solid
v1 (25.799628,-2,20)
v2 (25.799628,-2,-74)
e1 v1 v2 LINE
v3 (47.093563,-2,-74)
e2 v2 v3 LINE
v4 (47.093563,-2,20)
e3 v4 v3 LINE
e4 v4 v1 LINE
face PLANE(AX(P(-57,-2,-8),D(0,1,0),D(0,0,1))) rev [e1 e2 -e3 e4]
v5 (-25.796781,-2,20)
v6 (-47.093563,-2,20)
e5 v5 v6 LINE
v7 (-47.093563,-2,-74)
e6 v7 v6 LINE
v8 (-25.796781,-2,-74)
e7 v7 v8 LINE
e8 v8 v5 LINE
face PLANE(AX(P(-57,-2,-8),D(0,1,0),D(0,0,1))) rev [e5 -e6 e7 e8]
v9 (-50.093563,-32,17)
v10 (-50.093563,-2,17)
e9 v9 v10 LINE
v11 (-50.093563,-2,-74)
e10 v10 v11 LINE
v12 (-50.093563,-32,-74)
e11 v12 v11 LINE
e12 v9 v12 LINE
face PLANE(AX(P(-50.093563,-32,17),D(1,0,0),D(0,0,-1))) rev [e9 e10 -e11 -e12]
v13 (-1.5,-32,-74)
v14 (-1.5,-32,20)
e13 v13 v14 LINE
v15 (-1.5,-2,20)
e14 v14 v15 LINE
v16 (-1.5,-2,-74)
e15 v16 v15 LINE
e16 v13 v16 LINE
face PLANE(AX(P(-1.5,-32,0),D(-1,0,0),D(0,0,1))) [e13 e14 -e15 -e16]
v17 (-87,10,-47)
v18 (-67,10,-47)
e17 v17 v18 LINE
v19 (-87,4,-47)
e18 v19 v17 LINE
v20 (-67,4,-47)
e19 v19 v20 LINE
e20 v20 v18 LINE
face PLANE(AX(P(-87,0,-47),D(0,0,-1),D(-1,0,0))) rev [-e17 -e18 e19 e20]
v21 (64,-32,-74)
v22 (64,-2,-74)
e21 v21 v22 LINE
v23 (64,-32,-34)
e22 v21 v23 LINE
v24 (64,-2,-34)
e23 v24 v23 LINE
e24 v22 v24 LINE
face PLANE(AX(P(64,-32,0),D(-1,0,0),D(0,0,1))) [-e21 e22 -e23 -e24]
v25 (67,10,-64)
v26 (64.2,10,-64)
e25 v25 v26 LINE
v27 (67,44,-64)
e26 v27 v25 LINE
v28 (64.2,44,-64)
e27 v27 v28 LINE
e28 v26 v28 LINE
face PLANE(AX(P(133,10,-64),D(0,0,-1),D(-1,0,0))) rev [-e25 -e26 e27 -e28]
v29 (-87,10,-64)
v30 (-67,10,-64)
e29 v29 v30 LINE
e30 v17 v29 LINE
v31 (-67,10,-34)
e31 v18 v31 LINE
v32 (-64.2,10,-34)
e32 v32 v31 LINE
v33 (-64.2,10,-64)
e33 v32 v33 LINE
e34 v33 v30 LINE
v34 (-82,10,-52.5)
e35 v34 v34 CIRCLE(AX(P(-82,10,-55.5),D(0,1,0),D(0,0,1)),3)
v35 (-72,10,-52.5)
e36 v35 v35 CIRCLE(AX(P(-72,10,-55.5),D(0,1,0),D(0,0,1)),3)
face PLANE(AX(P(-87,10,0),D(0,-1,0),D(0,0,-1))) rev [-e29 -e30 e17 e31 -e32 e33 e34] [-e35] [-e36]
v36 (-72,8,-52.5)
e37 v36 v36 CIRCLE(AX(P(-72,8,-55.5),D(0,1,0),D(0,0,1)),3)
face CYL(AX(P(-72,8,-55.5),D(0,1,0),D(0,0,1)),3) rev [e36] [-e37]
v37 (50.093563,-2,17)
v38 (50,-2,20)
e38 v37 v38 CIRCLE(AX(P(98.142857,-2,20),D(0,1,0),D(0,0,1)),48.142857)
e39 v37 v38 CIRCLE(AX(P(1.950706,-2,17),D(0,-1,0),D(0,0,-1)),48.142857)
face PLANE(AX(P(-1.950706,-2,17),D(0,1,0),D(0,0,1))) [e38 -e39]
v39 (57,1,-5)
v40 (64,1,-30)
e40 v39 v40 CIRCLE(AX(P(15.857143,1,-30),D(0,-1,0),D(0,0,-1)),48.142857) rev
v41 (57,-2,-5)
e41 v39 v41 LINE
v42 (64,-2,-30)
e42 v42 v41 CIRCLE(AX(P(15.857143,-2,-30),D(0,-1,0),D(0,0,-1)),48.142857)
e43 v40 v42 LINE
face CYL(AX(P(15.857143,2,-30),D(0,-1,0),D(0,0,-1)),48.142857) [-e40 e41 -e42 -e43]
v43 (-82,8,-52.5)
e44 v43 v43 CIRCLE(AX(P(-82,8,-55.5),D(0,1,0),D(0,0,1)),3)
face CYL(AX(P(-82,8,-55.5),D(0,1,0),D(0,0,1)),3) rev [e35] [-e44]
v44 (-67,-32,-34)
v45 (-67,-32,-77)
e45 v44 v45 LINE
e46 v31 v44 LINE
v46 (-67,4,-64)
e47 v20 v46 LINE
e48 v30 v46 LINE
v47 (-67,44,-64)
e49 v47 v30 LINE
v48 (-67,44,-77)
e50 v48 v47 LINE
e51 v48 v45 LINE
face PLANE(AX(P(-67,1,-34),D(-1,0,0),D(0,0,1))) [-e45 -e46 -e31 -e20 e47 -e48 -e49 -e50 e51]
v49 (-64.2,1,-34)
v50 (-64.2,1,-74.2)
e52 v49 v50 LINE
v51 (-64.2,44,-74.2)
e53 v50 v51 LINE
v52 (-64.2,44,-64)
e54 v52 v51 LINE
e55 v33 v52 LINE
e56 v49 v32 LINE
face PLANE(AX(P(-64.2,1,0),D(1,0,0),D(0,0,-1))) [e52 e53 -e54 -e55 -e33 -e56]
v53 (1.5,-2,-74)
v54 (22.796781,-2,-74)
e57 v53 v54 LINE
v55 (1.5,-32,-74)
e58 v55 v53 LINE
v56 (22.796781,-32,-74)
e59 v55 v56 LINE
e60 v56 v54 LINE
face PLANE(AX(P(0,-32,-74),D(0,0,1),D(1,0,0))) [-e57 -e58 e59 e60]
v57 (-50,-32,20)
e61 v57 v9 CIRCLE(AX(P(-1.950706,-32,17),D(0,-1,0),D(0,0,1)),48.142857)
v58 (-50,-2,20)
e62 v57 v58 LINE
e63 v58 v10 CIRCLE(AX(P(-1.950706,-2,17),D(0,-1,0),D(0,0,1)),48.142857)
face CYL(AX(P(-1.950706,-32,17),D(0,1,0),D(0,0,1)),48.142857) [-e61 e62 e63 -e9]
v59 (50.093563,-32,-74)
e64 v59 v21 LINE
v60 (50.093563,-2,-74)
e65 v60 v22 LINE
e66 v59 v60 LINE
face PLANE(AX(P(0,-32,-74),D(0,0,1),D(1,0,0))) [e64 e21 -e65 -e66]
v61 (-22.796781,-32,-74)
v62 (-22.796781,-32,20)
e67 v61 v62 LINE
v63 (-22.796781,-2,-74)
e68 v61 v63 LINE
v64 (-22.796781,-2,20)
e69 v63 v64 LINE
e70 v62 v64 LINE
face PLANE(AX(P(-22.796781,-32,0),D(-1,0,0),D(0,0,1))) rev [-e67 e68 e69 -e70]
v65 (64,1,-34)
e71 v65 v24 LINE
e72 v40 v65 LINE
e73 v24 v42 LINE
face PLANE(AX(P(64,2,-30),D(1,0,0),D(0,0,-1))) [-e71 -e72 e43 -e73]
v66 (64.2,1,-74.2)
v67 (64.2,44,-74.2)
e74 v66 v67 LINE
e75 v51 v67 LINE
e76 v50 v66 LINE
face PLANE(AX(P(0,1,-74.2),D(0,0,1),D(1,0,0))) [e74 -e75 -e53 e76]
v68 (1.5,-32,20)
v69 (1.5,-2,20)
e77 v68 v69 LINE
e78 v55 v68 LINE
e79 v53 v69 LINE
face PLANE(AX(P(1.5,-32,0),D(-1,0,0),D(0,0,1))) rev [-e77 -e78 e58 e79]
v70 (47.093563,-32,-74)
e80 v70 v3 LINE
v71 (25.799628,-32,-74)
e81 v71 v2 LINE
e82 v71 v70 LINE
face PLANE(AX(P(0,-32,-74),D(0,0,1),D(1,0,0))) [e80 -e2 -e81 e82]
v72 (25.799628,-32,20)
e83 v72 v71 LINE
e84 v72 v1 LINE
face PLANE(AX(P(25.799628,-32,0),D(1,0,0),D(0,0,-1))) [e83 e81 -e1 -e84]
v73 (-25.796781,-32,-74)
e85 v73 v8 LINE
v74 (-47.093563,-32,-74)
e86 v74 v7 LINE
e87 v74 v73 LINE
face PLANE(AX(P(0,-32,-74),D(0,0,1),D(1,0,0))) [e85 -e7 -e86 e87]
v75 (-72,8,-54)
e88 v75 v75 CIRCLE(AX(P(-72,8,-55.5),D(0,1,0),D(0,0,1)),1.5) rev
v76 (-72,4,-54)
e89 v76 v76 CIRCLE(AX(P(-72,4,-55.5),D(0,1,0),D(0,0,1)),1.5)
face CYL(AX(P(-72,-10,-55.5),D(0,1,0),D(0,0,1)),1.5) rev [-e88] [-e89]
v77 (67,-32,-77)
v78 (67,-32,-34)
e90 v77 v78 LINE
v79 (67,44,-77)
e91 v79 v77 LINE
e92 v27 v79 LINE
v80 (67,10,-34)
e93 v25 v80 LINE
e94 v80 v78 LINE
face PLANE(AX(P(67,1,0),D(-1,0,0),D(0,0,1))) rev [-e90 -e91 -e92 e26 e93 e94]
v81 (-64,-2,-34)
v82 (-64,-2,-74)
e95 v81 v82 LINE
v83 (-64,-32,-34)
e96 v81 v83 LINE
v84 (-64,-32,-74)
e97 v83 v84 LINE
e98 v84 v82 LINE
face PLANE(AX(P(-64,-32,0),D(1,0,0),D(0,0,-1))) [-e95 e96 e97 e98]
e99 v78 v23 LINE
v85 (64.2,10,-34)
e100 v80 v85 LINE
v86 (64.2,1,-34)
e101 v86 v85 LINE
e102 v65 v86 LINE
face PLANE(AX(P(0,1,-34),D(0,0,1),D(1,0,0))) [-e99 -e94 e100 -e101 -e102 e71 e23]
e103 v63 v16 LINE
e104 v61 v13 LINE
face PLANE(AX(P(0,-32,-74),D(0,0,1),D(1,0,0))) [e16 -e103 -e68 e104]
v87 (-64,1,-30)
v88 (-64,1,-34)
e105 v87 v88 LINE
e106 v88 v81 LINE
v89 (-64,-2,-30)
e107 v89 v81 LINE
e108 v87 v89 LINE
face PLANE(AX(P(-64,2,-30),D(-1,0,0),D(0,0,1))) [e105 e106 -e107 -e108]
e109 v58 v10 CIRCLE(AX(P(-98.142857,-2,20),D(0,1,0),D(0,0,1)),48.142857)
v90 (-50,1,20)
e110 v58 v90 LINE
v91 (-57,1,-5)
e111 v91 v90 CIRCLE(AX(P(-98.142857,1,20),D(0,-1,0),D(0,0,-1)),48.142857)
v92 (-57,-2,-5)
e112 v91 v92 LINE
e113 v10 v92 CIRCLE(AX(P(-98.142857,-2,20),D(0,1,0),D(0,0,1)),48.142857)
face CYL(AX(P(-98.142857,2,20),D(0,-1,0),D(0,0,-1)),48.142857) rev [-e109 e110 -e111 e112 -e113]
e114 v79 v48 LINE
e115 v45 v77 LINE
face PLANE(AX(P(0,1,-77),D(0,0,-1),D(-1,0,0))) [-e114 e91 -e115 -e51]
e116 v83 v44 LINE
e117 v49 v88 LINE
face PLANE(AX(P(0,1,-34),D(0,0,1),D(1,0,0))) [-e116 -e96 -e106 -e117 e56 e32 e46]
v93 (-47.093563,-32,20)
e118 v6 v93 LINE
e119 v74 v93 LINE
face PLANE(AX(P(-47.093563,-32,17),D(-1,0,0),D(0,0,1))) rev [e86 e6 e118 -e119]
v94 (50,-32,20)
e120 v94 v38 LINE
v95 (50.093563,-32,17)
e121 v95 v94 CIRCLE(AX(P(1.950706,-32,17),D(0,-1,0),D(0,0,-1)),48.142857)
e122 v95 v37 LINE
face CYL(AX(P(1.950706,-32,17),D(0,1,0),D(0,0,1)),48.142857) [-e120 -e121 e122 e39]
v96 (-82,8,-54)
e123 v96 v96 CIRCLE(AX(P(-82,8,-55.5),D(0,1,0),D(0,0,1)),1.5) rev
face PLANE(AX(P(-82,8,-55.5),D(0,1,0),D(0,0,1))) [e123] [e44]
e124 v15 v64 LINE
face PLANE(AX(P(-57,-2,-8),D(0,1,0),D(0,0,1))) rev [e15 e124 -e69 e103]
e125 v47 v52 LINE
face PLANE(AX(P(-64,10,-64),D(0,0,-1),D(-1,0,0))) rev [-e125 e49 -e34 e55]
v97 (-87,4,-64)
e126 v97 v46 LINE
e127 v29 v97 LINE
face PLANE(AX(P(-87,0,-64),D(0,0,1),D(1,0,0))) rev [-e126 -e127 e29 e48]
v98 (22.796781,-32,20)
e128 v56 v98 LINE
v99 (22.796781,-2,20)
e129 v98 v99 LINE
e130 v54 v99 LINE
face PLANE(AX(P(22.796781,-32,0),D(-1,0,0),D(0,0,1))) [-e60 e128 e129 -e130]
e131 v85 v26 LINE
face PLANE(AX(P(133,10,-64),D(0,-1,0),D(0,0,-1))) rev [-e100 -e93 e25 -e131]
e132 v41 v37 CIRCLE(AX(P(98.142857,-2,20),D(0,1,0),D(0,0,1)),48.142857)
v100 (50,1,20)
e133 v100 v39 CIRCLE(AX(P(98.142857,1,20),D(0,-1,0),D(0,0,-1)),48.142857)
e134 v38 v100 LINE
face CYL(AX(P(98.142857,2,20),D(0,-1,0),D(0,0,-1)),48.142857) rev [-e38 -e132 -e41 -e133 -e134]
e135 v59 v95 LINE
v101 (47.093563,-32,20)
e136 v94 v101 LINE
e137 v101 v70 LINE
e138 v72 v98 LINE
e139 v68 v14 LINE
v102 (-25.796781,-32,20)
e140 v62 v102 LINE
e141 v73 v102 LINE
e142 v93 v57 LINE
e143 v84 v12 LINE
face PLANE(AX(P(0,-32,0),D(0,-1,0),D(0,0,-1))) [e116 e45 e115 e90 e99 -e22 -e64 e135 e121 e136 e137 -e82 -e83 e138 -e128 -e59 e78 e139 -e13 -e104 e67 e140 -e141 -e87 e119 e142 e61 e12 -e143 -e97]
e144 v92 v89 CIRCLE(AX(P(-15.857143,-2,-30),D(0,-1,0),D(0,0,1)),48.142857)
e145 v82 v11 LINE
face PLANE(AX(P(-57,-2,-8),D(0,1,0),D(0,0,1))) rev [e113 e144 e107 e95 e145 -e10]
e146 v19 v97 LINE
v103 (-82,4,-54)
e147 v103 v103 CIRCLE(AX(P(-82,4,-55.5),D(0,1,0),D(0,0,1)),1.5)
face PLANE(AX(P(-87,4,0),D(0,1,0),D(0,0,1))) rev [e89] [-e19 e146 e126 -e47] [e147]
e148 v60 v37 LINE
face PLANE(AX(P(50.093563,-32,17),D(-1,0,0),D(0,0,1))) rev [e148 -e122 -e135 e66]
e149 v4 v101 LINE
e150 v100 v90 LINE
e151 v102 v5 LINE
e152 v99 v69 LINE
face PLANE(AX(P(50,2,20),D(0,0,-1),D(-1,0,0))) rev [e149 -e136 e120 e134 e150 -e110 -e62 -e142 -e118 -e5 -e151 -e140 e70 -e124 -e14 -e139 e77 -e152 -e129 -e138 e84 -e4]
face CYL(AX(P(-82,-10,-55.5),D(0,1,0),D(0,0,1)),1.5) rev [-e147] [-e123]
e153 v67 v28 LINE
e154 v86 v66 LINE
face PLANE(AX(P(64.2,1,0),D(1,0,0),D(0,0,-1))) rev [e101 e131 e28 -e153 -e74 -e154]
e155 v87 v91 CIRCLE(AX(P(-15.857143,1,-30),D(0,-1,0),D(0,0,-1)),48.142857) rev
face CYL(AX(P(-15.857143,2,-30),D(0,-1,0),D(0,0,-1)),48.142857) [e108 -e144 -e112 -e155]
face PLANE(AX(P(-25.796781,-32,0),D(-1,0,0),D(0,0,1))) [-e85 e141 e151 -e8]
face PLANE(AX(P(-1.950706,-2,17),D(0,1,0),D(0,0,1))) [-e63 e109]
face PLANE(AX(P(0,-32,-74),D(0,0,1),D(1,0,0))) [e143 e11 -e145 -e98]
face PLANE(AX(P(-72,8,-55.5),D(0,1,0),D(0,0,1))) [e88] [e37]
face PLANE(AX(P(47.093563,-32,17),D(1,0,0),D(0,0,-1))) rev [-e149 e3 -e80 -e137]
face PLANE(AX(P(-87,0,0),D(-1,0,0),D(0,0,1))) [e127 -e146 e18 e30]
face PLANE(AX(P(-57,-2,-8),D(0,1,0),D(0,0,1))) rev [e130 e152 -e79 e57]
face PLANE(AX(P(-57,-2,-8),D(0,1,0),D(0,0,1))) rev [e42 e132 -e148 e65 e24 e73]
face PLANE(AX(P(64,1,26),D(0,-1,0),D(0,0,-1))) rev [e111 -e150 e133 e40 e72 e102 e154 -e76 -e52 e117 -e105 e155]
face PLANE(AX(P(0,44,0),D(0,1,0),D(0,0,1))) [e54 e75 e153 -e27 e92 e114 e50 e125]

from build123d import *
from build123d.topology import SkipClean

# Parameters (mm, degrees)
SKETCH_1_R           = 10
SKETCH_1_W           = 40
SKETCH_1_H           = 40
EXTRUDE_1_DEPTH      = 2
EXTRUDE_START        = 2
SKETCH_2_R           = 10
EXTRUDE_2_DEPTH      = 2
SKETCH_4_R           = 15
EXTRUDE_3_DEPTH      = 8
EXTRUDE_START_2      = -8
SKETCH_7_R           = 15
SKETCH_7_R_2         = 10
EXTRUDE_4_DEPTH      = 8
SKETCH_11_R          = 15
SKETCH_11_R_2        = 10
EXTRUDE_5_DEPTH      = 8
FILLET_1_R           = 8
EXTRUDE_START_3      = -1
SKETCH_20_R          = 10
EXTRUDE_7_DEPTH      = 1
CUT_EXTRUDE_START    = -4
CUT_EXTRUDE_2_DEPTH  = 4
EXTRUDE_8_DEPTH      = 4
SKETCH_28_R          = 10
EXTRUDE_10_DEPTH     = 4
SKETCH_29_R          = 10
CUT_EXTRUDE_5_DEPTH  = 3
CUT_EXTRUDE_START_2  = -8
CUT_EXTRUDE_6_DEPTH  = 8
SKETCH_32_R          = 10
EXTRUDE_11_DEPTH     = 4
SKETCH_33_W          = 128
SKETCH_33_H          = 1
CUT_EXTRUDE_7_DEPTH  = 100
SKETCH_34_W          = 128
SKETCH_34_H          = 3
EXTRUDE_12_DEPTH     = 42
EXTRUDE_13_DEPTH     = 3
SKETCH_36_W          = 128
SKETCH_36_H          = 3
EXTRUDE_14_DEPTH     = 30
EXTRUDE_15_DEPTH     = 30
SKETCH_40_W          = 128
SKETCH_40_H          = 3
EXTRUDE_16_DEPTH     = 30
SKETCH_41_W          = 3
SKETCH_41_H          = 51
EXTRUDE_17_DEPTH     = 30
SKETCH_42_W          = 128
SKETCH_42_H          = 0.2
SKETCH_42_W_2        = 0.2
SKETCH_42_H_2        = 40
CUT_EXTRUDE_8_DEPTH  = 42
EXTRUDE_18_DEPTH     = 20
CUT_EXTRUDE_9_DEPTH  = 20
SKETCH_45_R          = 5
CUT_EXTRUDE_10_DEPTH = 3
SKETCH_46_W          = 17
SKETCH_46_H          = 6
EXTRUDE_19_DEPTH     = 20
SKETCH_47_W          = 20
SKETCH_47_H          = 6
CUT_EXTRUDE_11_DEPTH = 20
CUT_EXTRUDE_12_DEPTH = 20
SKETCH_49_R          = 3
CUT_EXTRUDE_13_DEPTH = 2
SKETCH_50_W          = 30
SKETCH_50_H          = 33
CUT_EXTRUDE_14_DEPTH = 3
SKETCH_51_W          = 128.4
SKETCH_51_H          = 2.8
EXTRUDE_20_DEPTH     = 1
SKETCH_52_W          = 128
SKETCH_52_H          = 3
SKETCH_52_W_2        = 94.187125454
CUT_EXTRUDE_15_DEPTH = 30
SKETCH_53_W          = 3
SKETCH_53_H          = 40
EXTRUDE_21_DEPTH     = 30
SKETCH_54_W          = 1.5
SKETCH_54_H          = 47
SKETCH_54_W_2        = 3
SKETCH_54_H_2        = 94
SKETCH_54_W_3        = 1.502846805
EXTRUDE_23_DEPTH     = 30
SKETCH_55_W          = 30
SKETCH_55_H          = 34
CUT_EXTRUDE_16_DEPTH = 200


with BuildPart() as part:
    # 草图1 → 凸台-拉伸1 (new body)
    with BuildSketch(Plane(origin=(0, 0, 0), x_dir=(1, 0, 0), z_dir=(0, 1, 0))):
        with BuildLine():
            Line((0, -20), (50, -20))
            Line((50, -20), (57, -20))
            ThreePointArc((57, -20), (76.798989873, -11.798989873), (85, 8))
            Line((85, 8), (85, 52))
            Line((85, 52), (43, 52))
            Line((43, 52), (43, 72))
            Line((43, 72), (-43, 72))
            Line((-43, 72), (-43, 52))
            Line((-43, 52), (-85, 52))
            Line((-85, 52), (-85, 50))
            Line((-85, 50), (-85, 8))
            ThreePointArc((-85, 8), (-76.798989873, -11.798989873), (-57, -20))
            Line((-57, -20), (-50, -20))
            Line((-50, -20), (0, -20))
        make_face()
        with Locations(Location((18, 0, 0), (0, 0, 270))):
            Circle(SKETCH_1_R, mode=Mode.SUBTRACT)
        with Locations(Location((-18, 0, 0), (0, 0, 270))):
            Circle(SKETCH_1_R, mode=Mode.SUBTRACT)
        with Locations((-21, 50)):
            Rectangle(SKETCH_1_W, SKETCH_1_H, mode=Mode.SUBTRACT)
        with Locations((21, 50)):
            Rectangle(SKETCH_1_W, SKETCH_1_H, mode=Mode.SUBTRACT)
        with Locations((-63, 30)):
            Rectangle(SKETCH_1_W, SKETCH_1_H, mode=Mode.SUBTRACT)
        with Locations((63, 30)):
            Rectangle(SKETCH_1_W, SKETCH_1_H, mode=Mode.SUBTRACT)
    extrude(amount=EXTRUDE_1_DEPTH)

    # 草图2 → 凸台-拉伸2 (add)
    with SkipClean():  # the faces are left unmerged after this step: merging them gives an invalid solid
        with BuildSketch(Plane.XZ.offset(EXTRUDE_START)):
            with BuildLine():
                Line((-85, -8), (-85, -52))
                Line((-85, -52), (-43, -52))
                Line((-43, -52), (-43, -72))
                Line((-43, -72), (43, -72))
                Line((43, -72), (43, -52))
                Line((43, -52), (85, -52))
                Line((85, -52), (85, -8))
                ThreePointArc((85, -8), (76.798989873, 11.798989873), (57, 20))
                Line((57, 20), (-57, 20))
                ThreePointArc((-57, 20), (-76.798989873, 11.798989873), (-85, -8))
            make_face()
            with Locations(Location((-18, 0, 0), (0, 0, 270))):
                Circle(SKETCH_2_R, mode=Mode.SUBTRACT)
            with Locations(Location((18, 0, 0), (0, 0, 270))):
                Circle(SKETCH_2_R, mode=Mode.SUBTRACT)
        extrude(amount=-EXTRUDE_2_DEPTH)

    # 草图4 → 凸台-拉伸3 (add)
    with BuildSketch(Plane(origin=(0, 2, 0), x_dir=(1, 0, 0), z_dir=(0, 1, 0))):
        with BuildLine():
            Line((-50, -20), (0, -20))
            Line((0, -20), (50, -20))
            ThreePointArc((50, -20), (0, 30), (-50, -20))
        make_face()
        with Locations(Location((-18, 0, 0), (0, 0, 270))):
            Circle(SKETCH_4_R, mode=Mode.SUBTRACT)
        with Locations(Location((18, 0, 0), (0, 0, 270))):
            Circle(SKETCH_4_R, mode=Mode.SUBTRACT)
    extrude(amount=EXTRUDE_3_DEPTH)

    # loft up to a face of the part (loft_1)
    loft([Face(Wire([part.edges().sort_by_distance((-28.934529411, 10, -10.268206589))[0]])), Face(Wire([part.edges().sort_by_distance((-25.289686274, 2, -6.845471059))[0]]))], mode=Mode.SUBTRACT)

    # 草图7 → 凸台-拉伸4 (add)
    with BuildSketch(Plane(origin=(0, 10, 0), x_dir=(1, 0, 0), z_dir=(0, 1, 0)).offset(EXTRUDE_START_2)):
        with Locations((-18, 0)):
            Circle(SKETCH_7_R)
        with Locations(Location((-18, 0, 0), (0, 0, 90))):
            Circle(SKETCH_7_R_2, mode=Mode.SUBTRACT)
    extrude(amount=EXTRUDE_4_DEPTH)

    # 切除-放样2: read off the stored shape, not the designer's step
    # 切除-放样2: loft between two sections, ruled curve by curve
    loft_2_from = [
        Edge.make_bspline([(-3.624862246, 10, -4.284321948), (4.943781649, 10, 24.465953561), (-23.806493859, 10, 33.034597456), (-32.375137754, 10, 4.284321948), (-40.943781649, 10, -24.465953561), (-12.193506141, 10, -33.034597456), (-3.624862246, 10, -4.284321948)], [0, 0, 0, 0, 0.5, 0.5, 0.5, 1, 1, 1, 1], 3, [1, 0.333333333, 0.333333333, 1, 0.333333333, 0.333333333, 1]),
    ]
    loft_2_to = [
        Edge.make_bspline([(-10.022055605, 2, -6.029295417), (2.036535229, 2, 9.926593374), (-13.919353562, 2, 21.985184208), (-25.977944395, 2, 6.029295417), (-38.036535229, 2, -9.926593374), (-22.080646438, 2, -21.985184208), (-10.022055605, 2, -6.029295417)], [0, 0, 0, 0, 0.5, 0.5, 0.5, 1, 1, 1, 1], 3, [1, 0.333333333, 0.333333333, 1, 0.333333333, 0.333333333, 1]),
    ]
    loft_2 = Solid(Shell([*[Face.make_surface_from_curves(loft_2_from[k], loft_2_to[k]) for k in range(1)], Face(Wire(loft_2_from)), Face(Wire(loft_2_to))]))
    add(loft_2, mode=Mode.SUBTRACT)

    # 草图11 → 凸台-拉伸5 (add)
    with BuildSketch(Plane(origin=(0, 10, 0), x_dir=(1, 0, 0), z_dir=(0, 1, 0)).offset(EXTRUDE_START_2)):
        with Locations((18, 0)):
            Circle(SKETCH_11_R)
        with Locations(Location((18, 0, 0), (0, 0, 90))):
            Circle(SKETCH_11_R_2, mode=Mode.SUBTRACT)
    extrude(amount=EXTRUDE_5_DEPTH)

    # 切除-放样3: read off the stored shape, not the designer's step
    # 切除-放样3: loft between two sections, ruled curve by curve
    loft_3_from = [
        Edge.make_bspline([(32.65702084, 10, -3.189316556), (39.035653951, 10, 26.124725125), (9.721612271, 10, 32.503358236), (3.34297916, 10, 3.189316556), (-3.035653951, 10, -26.124725125), (26.278387729, 10, -32.503358236), (32.65702084, 10, -3.189316556)], [0, 0, 0, 0, 0.5, 0.5, 0.5, 1, 1, 1, 1], 3, [1, 0.333333333, 0.333333333, 1, 0.333333333, 0.333333333, 1]),
    ]
    loft_3_to = [
        Edge.make_bspline([(26.664439789, 2, -4.992743049), (36.649925886, 2, 12.336136528), (19.321046309, 2, 22.321622626), (9.335560211, 2, 4.992743049), (-0.649925886, 2, -12.336136528), (16.678953691, 2, -22.321622626), (26.664439789, 2, -4.992743049)], [0, 0, 0, 0, 0.5, 0.5, 0.5, 1, 1, 1, 1], 3, [1, 0.333333333, 0.333333333, 1, 0.333333333, 0.333333333, 1]),
    ]
    loft_3 = Solid(Shell([*[Face.make_surface_from_curves(loft_3_from[k], loft_3_to[k]) for k in range(1)], Face(Wire(loft_3_from)), Face(Wire(loft_3_to))]))
    add(loft_3, mode=Mode.SUBTRACT)

    # 圆角1
    fillet_1_edges = [part.edges().sort_by_distance(p)[0] for p in [
        (0, 10, -30),
    ]]
    fillet(fillet_1_edges, radius=FILLET_1_R - 0.0001)  # a hair under: the kernel refuses the full size

    # 草图20 → 凸台-拉伸7 (add)
    with BuildSketch(Plane(origin=(0, 2, 0), x_dir=(1, 0, 0), z_dir=(0, 1, 0)).offset(EXTRUDE_START_3)):
        with Locations(Location((-18, 0, 0), (0, 0, 90))):
            Circle(SKETCH_20_R)
        with Locations(Location((18, 0, 0), (0, 0, 90))):
            Circle(SKETCH_20_R)
    extrude(amount=EXTRUDE_7_DEPTH)

    # 草图21 → 切除-拉伸2 (cut)
    with BuildSketch(Plane(origin=(0, 2, 0), x_dir=(1, 0, 0), z_dir=(0, 1, 0)).offset(CUT_EXTRUDE_START)):
        with BuildLine():
            Line((-50, -20), (-103.463459811, -20))
            Line((-103.463459811, -20), (-103.463459811, 85.086510942))
            Line((-103.463459811, 85.086510942), (103.21519716, 85.086510942))
            Line((103.21519716, 85.086510942), (103.21519716, -20))
            Line((103.21519716, -20), (50, -20))
            ThreePointArc((50, -20), (0, 30), (-50, -20))
        make_face()
    extrude(amount=CUT_EXTRUDE_2_DEPTH, mode=Mode.SUBTRACT)

    # 草图22 → 凸台-拉伸8 (add)
    with BuildSketch(Plane.XZ.offset(2)):
        with BuildLine():
            Line((-64, -30), (-64, -74))
            Line((-64, -74), (0, -74))
            Line((0, -74), (64, -74))
            Line((64, -74), (64, -30))
            ThreePointArc((64, -30), (62.216982092, -17.019245014), (57, -5))
            ThreePointArc((57, -5), (51.783017908, 7.019245014), (50, 20))
            ThreePointArc((50, 20), (0, -30), (-50, 20))
            ThreePointArc((-50, 20), (-51.783017908, 7.019245014), (-57, -5))
            ThreePointArc((-57, -5), (-62.216982092, -17.019245014), (-64, -30))
        make_face()
    extrude(amount=-EXTRUDE_8_DEPTH)

    # 草图28 → 凸台-拉伸10 (add)
    with BuildSketch(Plane.XZ.offset(2)):
        with Locations((-18, 0)):
            Circle(SKETCH_28_R)
        with Locations((18, 0)):
            Circle(SKETCH_28_R)
    extrude(amount=-EXTRUDE_10_DEPTH)

    # 草图29 → 切除-拉伸5 (cut)
    with BuildSketch(Plane(origin=(0, 2, 0), x_dir=(1, 0, 0), z_dir=(0, 1, 0))):
        with Locations(Location((-18, 0, 0), (0, 0, 270))):
            Circle(SKETCH_29_R)
        with Locations(Location((18, 0, 0), (0, 0, 270))):
            Circle(SKETCH_29_R)
    extrude(amount=-CUT_EXTRUDE_5_DEPTH, mode=Mode.SUBTRACT)

    # 草图31 → 切除-拉伸6 (cut)
    with BuildSketch(Plane(origin=(0, 10, 0), x_dir=(1, 0, 0), z_dir=(0, 1, 0)).offset(CUT_EXTRUDE_START_2)):
        with BuildLine():
            Line((-50, -20), (50, -20))
            ThreePointArc((50, -20), (0, 30), (-50, -20))
        make_face()
    extrude(amount=CUT_EXTRUDE_6_DEPTH, mode=Mode.SUBTRACT)

    # 草图32 → 凸台-拉伸11 (add)
    with BuildSketch(Plane(origin=(0, 2, 0), x_dir=(1, 0, 0), z_dir=(0, 1, 0))):
        with Locations((-18, 0)):
            Circle(SKETCH_32_R)
        with Locations((18, 0)):
            Circle(SKETCH_32_R)
    extrude(amount=-EXTRUDE_11_DEPTH)

    # 草图33 → 切除-拉伸7 (cut)
    with BuildSketch(Plane(origin=(0, 0, -74), x_dir=(-1, 0, 0), z_dir=(0, 0, -1))):
        with Locations((0, 1.5)):
            Rectangle(SKETCH_33_W, SKETCH_33_H)
    extrude(amount=-CUT_EXTRUDE_7_DEPTH, mode=Mode.SUBTRACT)



with BuildPart() as body_2:
    # 草图34 → 凸台-拉伸12 (new body)
    with BuildSketch(Plane(origin=(0, 1, 0), x_dir=(1, 0, 0), z_dir=(0, 1, 0))):
        Polygon((64, 77), (64, 74), (64, 34), (67, 34), (67, 77), align=None)
        with Locations((0, 75.5)):
            Rectangle(SKETCH_34_W, SKETCH_34_H)
        Polygon((-64, 34), (-64, 74), (-64, 77), (-67, 77), (-67, 34), align=None)
    extrude(amount=EXTRUDE_12_DEPTH)


with BuildPart() as part_1:
    add(part.part)

    add(body_2.part)  # 凸台-拉伸13 merges body 2
    # 草图35 → 凸台-拉伸13 (add)
    with BuildSketch(Plane.XZ.offset(2)):
        Polygon((-64, -34), (-67, -34), (-67, -77), (67, -77), (67, -34), (64, -34), (64, -74), (-64, -74), align=None)
    extrude(amount=-EXTRUDE_13_DEPTH)

    # 草图36 → 凸台-拉伸14 (add)
    with BuildSketch(Plane.XZ.offset(2)):
        Polygon((64, -34), (64, -74), (64, -77), (67, -77), (67, -34), align=None)
        with Locations((0, -75.5)):
            Rectangle(SKETCH_36_W, SKETCH_36_H)
        Polygon((-64, -34), (-67, -34), (-67, -77), (-64, -77), (-64, -74), align=None)
    extrude(amount=EXTRUDE_14_DEPTH)

    # 草图37 → 凸台-拉伸15 (add)
    with BuildSketch(Plane(origin=(0, -2, 0), x_dir=(-1, 0, 0), z_dir=(0, -1, 0))):
        with BuildLine():
            Line((0, -17), (-50.093562727, -17))
            ThreePointArc((-50.093562727, -17), (-50.07016636, -18.500729321), (-50, -20))
            Line((-50, -20), (50, -20))
            ThreePointArc((50, -20), (50.07016636, -18.500729321), (50.093562727, -17))
            Line((50.093562727, -17), (0, -17))
        make_face()
    extrude(amount=EXTRUDE_15_DEPTH)

    # 草图40 → 凸台-拉伸16 (add)
    with BuildSketch(Plane.XZ.offset(2)):
        with Locations((0, -35.5)):
            Rectangle(SKETCH_40_W, SKETCH_40_H)
    extrude(amount=EXTRUDE_16_DEPTH)

    # 草图41 → 凸台-拉伸17 (add)
    with BuildSketch(Plane.XZ.offset(2)):
        with Locations((-48.593562727, -8.5)):
            Rectangle(SKETCH_41_W, SKETCH_41_H)
        with Locations((48.593562727, -8.5)):
            Rectangle(SKETCH_41_W, SKETCH_41_H)
    extrude(amount=EXTRUDE_17_DEPTH)

    # 草图42 → 切除-拉伸8 (cut)
    with BuildSketch(Plane(origin=(0, 43, 0), x_dir=(1, 0, 0), z_dir=(0, 1, 0))):
        with Locations((0, 74.1)):
            Rectangle(SKETCH_42_W, SKETCH_42_H)
        with Locations((-64.1, 74.1)):
            Rectangle(SKETCH_42_W_2, SKETCH_42_H)
        with Locations((-64.1, 54)):
            Rectangle(SKETCH_42_W_2, SKETCH_42_H_2)
        with Locations((64.1, 54)):
            Rectangle(SKETCH_42_W_2, SKETCH_42_H_2)
        with Locations((64.1, 74.1)):
            Rectangle(SKETCH_42_W_2, SKETCH_42_H)
    extrude(amount=-CUT_EXTRUDE_8_DEPTH, mode=Mode.SUBTRACT)

    # 草图43 → 凸台-拉伸18 (add)
    with BuildSketch(Plane.ZY.offset(67)):
        Polygon((-45.5, -2), (-65.5, -2), (-65.5, 4), (-55.5, 4), (-45.5, 4), align=None)
    extrude(amount=EXTRUDE_18_DEPTH)

    # 草图44 → 切除-拉伸9 (cut)
    with BuildSketch(Plane(origin=(0, 4, 0), x_dir=(1, 0, 0), z_dir=(0, 1, 0))):
        with BuildLine():
            ThreePointArc((-74.4, 55.5), (-76.005023076, 57.902086785), (-78.838477631, 57.338477631))
            Line((-78.838477631, 57.338477631), (-75.161522369, 53.661522369))
            ThreePointArc((-75.161522369, 53.661522369), (-74.597913215, 54.505023076), (-74.4, 55.5))
        make_face()
        with BuildLine():
            Line((-75.161522369, 53.661522369), (-78.838477631, 57.338477631))
            ThreePointArc((-78.838477631, 57.338477631), (-78.838477631, 53.661522369), (-75.161522369, 53.661522369))
        make_face()
    extrude(amount=-CUT_EXTRUDE_9_DEPTH, mode=Mode.SUBTRACT)

    # 草图45 → 切除-拉伸10 (cut)
    with BuildSketch(Plane(origin=(0, 4, 0), x_dir=(1, 0, 0), z_dir=(0, 1, 0))):
        with Locations(Location((-77, 55.5, 0), (0, 0, 270))):
            Circle(SKETCH_45_R)
    extrude(amount=-CUT_EXTRUDE_10_DEPTH, mode=Mode.SUBTRACT)

    # 草图46 → 凸台-拉伸19 (add)
    with BuildSketch(Plane.ZY.offset(67)):
        with Locations((-55.5, 7)):
            Rectangle(SKETCH_46_W, SKETCH_46_H)
    extrude(amount=EXTRUDE_19_DEPTH)

    # 草图47 → 切除-拉伸11 (cut)
    with BuildSketch(Plane.ZY.offset(87)):
        with Locations((-55.5, 1)):
            Rectangle(SKETCH_47_W, SKETCH_47_H)
    extrude(amount=-CUT_EXTRUDE_11_DEPTH, mode=Mode.SUBTRACT)

    # 草图48 → 切除-拉伸12 (cut)
    with BuildSketch(Plane(origin=(0, 10, 0), x_dir=(1, 0, 0), z_dir=(0, 1, 0))):
        with BuildLine():
            ThreePointArc((-83.5, 55.5), (-82, 54), (-80.5, 55.5))
            Line((-80.5, 55.5), (-83.5, 55.5))
        make_face()
        with BuildLine():
            Line((-83.5, 55.5), (-80.5, 55.5))
            ThreePointArc((-80.5, 55.5), (-82, 57), (-83.5, 55.5))
        make_face()
        with BuildLine():
            ThreePointArc((-70.5, 55.5), (-72, 57), (-73.5, 55.5))
            Line((-73.5, 55.5), (-70.5, 55.5))
        make_face()
        with BuildLine():
            Line((-70.5, 55.5), (-73.5, 55.5))
            ThreePointArc((-73.5, 55.5), (-72, 54), (-70.5, 55.5))
        make_face()
    extrude(amount=-CUT_EXTRUDE_12_DEPTH, mode=Mode.SUBTRACT)

    # 草图49 → 切除-拉伸13 (cut)
    with BuildSketch(Plane(origin=(0, 10, 0), x_dir=(1, 0, 0), z_dir=(0, 1, 0))):
        with Locations(Location((-82, 55.5, 0), (0, 0, 270))):
            Circle(SKETCH_49_R)
        with Locations(Location((-72, 55.5, 0), (0, 0, 270))):
            Circle(SKETCH_49_R)
    extrude(amount=-CUT_EXTRUDE_13_DEPTH, mode=Mode.SUBTRACT)

    # 草图50 → 切除-拉伸14 (cut)
    with BuildSketch(Plane.ZY.offset(67)):
        with Locations((-49, 26.5)):
            Rectangle(SKETCH_50_W, SKETCH_50_H)
    extrude(amount=-CUT_EXTRUDE_14_DEPTH, mode=Mode.SUBTRACT)

    # 草图51 → 凸台-拉伸20 (add)
    with BuildSketch(Plane(origin=(0, 43, 0), x_dir=(1, 0, 0), z_dir=(0, 1, 0))):
        with Locations((0, 75.6)):
            Rectangle(SKETCH_51_W, SKETCH_51_H)
        Polygon((-67, 64), (-64.2, 64), (-64.2, 74.2), (-64.2, 77), (-67, 77), align=None)
        Polygon((64.2, 77), (64.2, 74.2), (64.2, 34), (67, 34), (67, 77), align=None)
    extrude(amount=EXTRUDE_20_DEPTH)

    # 草图52 → 切除-拉伸15 (cut)
    with BuildSketch(Plane.XZ.offset(32)):
        with Locations((0, -35.5)):
            Rectangle(SKETCH_52_W, SKETCH_52_H)
        with Locations((0, 18.5)):
            Rectangle(SKETCH_52_W_2, SKETCH_52_H)
    extrude(amount=-CUT_EXTRUDE_15_DEPTH, mode=Mode.SUBTRACT)

    # 草图53 → 凸台-拉伸21 (add)
    with BuildSketch(Plane.XZ.offset(2)):
        with Locations((-48.593562727, -54)):
            Rectangle(SKETCH_53_W, SKETCH_53_H)
        with Locations((48.593562727, -54)):
            Rectangle(SKETCH_53_W, SKETCH_53_H)
    extrude(amount=EXTRUDE_21_DEPTH)

    # 草图54 → 凸台-拉伸23 (add)
    with BuildSketch(Plane.XZ.offset(2)):
        Polygon((-22.796781363, 20), (-24.296781363, 20), (-24.296781363, -27), (-24.296781363, -74), (-22.796781363, -74), align=None)
        with Locations((-25.046781363, -3.5)):
            Rectangle(SKETCH_54_W, SKETCH_54_H)
        with Locations((-25.046781363, -50.5)):
            Rectangle(SKETCH_54_W, SKETCH_54_H)
        with Locations((0, -27)):
            Rectangle(SKETCH_54_W_2, SKETCH_54_H_2)
        with Locations((25.048204766, -3.5)):
            Rectangle(SKETCH_54_W_3, SKETCH_54_H)
        with Locations((23.546781363, -3.5)):
            Rectangle(SKETCH_54_W, SKETCH_54_H)
        with Locations((23.546781363, -50.5)):
            Rectangle(SKETCH_54_W, SKETCH_54_H)
        with Locations((25.048204766, -50.5)):
            Rectangle(SKETCH_54_W_3, SKETCH_54_H)
    extrude(amount=EXTRUDE_23_DEPTH)

    # 草图55 → 切除-拉伸16 (cut)
    with BuildSketch(Plane.ZY.offset(67)):
        with Locations((-49, 27)):
            Rectangle(SKETCH_55_W, SKETCH_55_H)
    extrude(amount=-CUT_EXTRUDE_16_DEPTH, mode=Mode.SUBTRACT)


solid = part_1.part
